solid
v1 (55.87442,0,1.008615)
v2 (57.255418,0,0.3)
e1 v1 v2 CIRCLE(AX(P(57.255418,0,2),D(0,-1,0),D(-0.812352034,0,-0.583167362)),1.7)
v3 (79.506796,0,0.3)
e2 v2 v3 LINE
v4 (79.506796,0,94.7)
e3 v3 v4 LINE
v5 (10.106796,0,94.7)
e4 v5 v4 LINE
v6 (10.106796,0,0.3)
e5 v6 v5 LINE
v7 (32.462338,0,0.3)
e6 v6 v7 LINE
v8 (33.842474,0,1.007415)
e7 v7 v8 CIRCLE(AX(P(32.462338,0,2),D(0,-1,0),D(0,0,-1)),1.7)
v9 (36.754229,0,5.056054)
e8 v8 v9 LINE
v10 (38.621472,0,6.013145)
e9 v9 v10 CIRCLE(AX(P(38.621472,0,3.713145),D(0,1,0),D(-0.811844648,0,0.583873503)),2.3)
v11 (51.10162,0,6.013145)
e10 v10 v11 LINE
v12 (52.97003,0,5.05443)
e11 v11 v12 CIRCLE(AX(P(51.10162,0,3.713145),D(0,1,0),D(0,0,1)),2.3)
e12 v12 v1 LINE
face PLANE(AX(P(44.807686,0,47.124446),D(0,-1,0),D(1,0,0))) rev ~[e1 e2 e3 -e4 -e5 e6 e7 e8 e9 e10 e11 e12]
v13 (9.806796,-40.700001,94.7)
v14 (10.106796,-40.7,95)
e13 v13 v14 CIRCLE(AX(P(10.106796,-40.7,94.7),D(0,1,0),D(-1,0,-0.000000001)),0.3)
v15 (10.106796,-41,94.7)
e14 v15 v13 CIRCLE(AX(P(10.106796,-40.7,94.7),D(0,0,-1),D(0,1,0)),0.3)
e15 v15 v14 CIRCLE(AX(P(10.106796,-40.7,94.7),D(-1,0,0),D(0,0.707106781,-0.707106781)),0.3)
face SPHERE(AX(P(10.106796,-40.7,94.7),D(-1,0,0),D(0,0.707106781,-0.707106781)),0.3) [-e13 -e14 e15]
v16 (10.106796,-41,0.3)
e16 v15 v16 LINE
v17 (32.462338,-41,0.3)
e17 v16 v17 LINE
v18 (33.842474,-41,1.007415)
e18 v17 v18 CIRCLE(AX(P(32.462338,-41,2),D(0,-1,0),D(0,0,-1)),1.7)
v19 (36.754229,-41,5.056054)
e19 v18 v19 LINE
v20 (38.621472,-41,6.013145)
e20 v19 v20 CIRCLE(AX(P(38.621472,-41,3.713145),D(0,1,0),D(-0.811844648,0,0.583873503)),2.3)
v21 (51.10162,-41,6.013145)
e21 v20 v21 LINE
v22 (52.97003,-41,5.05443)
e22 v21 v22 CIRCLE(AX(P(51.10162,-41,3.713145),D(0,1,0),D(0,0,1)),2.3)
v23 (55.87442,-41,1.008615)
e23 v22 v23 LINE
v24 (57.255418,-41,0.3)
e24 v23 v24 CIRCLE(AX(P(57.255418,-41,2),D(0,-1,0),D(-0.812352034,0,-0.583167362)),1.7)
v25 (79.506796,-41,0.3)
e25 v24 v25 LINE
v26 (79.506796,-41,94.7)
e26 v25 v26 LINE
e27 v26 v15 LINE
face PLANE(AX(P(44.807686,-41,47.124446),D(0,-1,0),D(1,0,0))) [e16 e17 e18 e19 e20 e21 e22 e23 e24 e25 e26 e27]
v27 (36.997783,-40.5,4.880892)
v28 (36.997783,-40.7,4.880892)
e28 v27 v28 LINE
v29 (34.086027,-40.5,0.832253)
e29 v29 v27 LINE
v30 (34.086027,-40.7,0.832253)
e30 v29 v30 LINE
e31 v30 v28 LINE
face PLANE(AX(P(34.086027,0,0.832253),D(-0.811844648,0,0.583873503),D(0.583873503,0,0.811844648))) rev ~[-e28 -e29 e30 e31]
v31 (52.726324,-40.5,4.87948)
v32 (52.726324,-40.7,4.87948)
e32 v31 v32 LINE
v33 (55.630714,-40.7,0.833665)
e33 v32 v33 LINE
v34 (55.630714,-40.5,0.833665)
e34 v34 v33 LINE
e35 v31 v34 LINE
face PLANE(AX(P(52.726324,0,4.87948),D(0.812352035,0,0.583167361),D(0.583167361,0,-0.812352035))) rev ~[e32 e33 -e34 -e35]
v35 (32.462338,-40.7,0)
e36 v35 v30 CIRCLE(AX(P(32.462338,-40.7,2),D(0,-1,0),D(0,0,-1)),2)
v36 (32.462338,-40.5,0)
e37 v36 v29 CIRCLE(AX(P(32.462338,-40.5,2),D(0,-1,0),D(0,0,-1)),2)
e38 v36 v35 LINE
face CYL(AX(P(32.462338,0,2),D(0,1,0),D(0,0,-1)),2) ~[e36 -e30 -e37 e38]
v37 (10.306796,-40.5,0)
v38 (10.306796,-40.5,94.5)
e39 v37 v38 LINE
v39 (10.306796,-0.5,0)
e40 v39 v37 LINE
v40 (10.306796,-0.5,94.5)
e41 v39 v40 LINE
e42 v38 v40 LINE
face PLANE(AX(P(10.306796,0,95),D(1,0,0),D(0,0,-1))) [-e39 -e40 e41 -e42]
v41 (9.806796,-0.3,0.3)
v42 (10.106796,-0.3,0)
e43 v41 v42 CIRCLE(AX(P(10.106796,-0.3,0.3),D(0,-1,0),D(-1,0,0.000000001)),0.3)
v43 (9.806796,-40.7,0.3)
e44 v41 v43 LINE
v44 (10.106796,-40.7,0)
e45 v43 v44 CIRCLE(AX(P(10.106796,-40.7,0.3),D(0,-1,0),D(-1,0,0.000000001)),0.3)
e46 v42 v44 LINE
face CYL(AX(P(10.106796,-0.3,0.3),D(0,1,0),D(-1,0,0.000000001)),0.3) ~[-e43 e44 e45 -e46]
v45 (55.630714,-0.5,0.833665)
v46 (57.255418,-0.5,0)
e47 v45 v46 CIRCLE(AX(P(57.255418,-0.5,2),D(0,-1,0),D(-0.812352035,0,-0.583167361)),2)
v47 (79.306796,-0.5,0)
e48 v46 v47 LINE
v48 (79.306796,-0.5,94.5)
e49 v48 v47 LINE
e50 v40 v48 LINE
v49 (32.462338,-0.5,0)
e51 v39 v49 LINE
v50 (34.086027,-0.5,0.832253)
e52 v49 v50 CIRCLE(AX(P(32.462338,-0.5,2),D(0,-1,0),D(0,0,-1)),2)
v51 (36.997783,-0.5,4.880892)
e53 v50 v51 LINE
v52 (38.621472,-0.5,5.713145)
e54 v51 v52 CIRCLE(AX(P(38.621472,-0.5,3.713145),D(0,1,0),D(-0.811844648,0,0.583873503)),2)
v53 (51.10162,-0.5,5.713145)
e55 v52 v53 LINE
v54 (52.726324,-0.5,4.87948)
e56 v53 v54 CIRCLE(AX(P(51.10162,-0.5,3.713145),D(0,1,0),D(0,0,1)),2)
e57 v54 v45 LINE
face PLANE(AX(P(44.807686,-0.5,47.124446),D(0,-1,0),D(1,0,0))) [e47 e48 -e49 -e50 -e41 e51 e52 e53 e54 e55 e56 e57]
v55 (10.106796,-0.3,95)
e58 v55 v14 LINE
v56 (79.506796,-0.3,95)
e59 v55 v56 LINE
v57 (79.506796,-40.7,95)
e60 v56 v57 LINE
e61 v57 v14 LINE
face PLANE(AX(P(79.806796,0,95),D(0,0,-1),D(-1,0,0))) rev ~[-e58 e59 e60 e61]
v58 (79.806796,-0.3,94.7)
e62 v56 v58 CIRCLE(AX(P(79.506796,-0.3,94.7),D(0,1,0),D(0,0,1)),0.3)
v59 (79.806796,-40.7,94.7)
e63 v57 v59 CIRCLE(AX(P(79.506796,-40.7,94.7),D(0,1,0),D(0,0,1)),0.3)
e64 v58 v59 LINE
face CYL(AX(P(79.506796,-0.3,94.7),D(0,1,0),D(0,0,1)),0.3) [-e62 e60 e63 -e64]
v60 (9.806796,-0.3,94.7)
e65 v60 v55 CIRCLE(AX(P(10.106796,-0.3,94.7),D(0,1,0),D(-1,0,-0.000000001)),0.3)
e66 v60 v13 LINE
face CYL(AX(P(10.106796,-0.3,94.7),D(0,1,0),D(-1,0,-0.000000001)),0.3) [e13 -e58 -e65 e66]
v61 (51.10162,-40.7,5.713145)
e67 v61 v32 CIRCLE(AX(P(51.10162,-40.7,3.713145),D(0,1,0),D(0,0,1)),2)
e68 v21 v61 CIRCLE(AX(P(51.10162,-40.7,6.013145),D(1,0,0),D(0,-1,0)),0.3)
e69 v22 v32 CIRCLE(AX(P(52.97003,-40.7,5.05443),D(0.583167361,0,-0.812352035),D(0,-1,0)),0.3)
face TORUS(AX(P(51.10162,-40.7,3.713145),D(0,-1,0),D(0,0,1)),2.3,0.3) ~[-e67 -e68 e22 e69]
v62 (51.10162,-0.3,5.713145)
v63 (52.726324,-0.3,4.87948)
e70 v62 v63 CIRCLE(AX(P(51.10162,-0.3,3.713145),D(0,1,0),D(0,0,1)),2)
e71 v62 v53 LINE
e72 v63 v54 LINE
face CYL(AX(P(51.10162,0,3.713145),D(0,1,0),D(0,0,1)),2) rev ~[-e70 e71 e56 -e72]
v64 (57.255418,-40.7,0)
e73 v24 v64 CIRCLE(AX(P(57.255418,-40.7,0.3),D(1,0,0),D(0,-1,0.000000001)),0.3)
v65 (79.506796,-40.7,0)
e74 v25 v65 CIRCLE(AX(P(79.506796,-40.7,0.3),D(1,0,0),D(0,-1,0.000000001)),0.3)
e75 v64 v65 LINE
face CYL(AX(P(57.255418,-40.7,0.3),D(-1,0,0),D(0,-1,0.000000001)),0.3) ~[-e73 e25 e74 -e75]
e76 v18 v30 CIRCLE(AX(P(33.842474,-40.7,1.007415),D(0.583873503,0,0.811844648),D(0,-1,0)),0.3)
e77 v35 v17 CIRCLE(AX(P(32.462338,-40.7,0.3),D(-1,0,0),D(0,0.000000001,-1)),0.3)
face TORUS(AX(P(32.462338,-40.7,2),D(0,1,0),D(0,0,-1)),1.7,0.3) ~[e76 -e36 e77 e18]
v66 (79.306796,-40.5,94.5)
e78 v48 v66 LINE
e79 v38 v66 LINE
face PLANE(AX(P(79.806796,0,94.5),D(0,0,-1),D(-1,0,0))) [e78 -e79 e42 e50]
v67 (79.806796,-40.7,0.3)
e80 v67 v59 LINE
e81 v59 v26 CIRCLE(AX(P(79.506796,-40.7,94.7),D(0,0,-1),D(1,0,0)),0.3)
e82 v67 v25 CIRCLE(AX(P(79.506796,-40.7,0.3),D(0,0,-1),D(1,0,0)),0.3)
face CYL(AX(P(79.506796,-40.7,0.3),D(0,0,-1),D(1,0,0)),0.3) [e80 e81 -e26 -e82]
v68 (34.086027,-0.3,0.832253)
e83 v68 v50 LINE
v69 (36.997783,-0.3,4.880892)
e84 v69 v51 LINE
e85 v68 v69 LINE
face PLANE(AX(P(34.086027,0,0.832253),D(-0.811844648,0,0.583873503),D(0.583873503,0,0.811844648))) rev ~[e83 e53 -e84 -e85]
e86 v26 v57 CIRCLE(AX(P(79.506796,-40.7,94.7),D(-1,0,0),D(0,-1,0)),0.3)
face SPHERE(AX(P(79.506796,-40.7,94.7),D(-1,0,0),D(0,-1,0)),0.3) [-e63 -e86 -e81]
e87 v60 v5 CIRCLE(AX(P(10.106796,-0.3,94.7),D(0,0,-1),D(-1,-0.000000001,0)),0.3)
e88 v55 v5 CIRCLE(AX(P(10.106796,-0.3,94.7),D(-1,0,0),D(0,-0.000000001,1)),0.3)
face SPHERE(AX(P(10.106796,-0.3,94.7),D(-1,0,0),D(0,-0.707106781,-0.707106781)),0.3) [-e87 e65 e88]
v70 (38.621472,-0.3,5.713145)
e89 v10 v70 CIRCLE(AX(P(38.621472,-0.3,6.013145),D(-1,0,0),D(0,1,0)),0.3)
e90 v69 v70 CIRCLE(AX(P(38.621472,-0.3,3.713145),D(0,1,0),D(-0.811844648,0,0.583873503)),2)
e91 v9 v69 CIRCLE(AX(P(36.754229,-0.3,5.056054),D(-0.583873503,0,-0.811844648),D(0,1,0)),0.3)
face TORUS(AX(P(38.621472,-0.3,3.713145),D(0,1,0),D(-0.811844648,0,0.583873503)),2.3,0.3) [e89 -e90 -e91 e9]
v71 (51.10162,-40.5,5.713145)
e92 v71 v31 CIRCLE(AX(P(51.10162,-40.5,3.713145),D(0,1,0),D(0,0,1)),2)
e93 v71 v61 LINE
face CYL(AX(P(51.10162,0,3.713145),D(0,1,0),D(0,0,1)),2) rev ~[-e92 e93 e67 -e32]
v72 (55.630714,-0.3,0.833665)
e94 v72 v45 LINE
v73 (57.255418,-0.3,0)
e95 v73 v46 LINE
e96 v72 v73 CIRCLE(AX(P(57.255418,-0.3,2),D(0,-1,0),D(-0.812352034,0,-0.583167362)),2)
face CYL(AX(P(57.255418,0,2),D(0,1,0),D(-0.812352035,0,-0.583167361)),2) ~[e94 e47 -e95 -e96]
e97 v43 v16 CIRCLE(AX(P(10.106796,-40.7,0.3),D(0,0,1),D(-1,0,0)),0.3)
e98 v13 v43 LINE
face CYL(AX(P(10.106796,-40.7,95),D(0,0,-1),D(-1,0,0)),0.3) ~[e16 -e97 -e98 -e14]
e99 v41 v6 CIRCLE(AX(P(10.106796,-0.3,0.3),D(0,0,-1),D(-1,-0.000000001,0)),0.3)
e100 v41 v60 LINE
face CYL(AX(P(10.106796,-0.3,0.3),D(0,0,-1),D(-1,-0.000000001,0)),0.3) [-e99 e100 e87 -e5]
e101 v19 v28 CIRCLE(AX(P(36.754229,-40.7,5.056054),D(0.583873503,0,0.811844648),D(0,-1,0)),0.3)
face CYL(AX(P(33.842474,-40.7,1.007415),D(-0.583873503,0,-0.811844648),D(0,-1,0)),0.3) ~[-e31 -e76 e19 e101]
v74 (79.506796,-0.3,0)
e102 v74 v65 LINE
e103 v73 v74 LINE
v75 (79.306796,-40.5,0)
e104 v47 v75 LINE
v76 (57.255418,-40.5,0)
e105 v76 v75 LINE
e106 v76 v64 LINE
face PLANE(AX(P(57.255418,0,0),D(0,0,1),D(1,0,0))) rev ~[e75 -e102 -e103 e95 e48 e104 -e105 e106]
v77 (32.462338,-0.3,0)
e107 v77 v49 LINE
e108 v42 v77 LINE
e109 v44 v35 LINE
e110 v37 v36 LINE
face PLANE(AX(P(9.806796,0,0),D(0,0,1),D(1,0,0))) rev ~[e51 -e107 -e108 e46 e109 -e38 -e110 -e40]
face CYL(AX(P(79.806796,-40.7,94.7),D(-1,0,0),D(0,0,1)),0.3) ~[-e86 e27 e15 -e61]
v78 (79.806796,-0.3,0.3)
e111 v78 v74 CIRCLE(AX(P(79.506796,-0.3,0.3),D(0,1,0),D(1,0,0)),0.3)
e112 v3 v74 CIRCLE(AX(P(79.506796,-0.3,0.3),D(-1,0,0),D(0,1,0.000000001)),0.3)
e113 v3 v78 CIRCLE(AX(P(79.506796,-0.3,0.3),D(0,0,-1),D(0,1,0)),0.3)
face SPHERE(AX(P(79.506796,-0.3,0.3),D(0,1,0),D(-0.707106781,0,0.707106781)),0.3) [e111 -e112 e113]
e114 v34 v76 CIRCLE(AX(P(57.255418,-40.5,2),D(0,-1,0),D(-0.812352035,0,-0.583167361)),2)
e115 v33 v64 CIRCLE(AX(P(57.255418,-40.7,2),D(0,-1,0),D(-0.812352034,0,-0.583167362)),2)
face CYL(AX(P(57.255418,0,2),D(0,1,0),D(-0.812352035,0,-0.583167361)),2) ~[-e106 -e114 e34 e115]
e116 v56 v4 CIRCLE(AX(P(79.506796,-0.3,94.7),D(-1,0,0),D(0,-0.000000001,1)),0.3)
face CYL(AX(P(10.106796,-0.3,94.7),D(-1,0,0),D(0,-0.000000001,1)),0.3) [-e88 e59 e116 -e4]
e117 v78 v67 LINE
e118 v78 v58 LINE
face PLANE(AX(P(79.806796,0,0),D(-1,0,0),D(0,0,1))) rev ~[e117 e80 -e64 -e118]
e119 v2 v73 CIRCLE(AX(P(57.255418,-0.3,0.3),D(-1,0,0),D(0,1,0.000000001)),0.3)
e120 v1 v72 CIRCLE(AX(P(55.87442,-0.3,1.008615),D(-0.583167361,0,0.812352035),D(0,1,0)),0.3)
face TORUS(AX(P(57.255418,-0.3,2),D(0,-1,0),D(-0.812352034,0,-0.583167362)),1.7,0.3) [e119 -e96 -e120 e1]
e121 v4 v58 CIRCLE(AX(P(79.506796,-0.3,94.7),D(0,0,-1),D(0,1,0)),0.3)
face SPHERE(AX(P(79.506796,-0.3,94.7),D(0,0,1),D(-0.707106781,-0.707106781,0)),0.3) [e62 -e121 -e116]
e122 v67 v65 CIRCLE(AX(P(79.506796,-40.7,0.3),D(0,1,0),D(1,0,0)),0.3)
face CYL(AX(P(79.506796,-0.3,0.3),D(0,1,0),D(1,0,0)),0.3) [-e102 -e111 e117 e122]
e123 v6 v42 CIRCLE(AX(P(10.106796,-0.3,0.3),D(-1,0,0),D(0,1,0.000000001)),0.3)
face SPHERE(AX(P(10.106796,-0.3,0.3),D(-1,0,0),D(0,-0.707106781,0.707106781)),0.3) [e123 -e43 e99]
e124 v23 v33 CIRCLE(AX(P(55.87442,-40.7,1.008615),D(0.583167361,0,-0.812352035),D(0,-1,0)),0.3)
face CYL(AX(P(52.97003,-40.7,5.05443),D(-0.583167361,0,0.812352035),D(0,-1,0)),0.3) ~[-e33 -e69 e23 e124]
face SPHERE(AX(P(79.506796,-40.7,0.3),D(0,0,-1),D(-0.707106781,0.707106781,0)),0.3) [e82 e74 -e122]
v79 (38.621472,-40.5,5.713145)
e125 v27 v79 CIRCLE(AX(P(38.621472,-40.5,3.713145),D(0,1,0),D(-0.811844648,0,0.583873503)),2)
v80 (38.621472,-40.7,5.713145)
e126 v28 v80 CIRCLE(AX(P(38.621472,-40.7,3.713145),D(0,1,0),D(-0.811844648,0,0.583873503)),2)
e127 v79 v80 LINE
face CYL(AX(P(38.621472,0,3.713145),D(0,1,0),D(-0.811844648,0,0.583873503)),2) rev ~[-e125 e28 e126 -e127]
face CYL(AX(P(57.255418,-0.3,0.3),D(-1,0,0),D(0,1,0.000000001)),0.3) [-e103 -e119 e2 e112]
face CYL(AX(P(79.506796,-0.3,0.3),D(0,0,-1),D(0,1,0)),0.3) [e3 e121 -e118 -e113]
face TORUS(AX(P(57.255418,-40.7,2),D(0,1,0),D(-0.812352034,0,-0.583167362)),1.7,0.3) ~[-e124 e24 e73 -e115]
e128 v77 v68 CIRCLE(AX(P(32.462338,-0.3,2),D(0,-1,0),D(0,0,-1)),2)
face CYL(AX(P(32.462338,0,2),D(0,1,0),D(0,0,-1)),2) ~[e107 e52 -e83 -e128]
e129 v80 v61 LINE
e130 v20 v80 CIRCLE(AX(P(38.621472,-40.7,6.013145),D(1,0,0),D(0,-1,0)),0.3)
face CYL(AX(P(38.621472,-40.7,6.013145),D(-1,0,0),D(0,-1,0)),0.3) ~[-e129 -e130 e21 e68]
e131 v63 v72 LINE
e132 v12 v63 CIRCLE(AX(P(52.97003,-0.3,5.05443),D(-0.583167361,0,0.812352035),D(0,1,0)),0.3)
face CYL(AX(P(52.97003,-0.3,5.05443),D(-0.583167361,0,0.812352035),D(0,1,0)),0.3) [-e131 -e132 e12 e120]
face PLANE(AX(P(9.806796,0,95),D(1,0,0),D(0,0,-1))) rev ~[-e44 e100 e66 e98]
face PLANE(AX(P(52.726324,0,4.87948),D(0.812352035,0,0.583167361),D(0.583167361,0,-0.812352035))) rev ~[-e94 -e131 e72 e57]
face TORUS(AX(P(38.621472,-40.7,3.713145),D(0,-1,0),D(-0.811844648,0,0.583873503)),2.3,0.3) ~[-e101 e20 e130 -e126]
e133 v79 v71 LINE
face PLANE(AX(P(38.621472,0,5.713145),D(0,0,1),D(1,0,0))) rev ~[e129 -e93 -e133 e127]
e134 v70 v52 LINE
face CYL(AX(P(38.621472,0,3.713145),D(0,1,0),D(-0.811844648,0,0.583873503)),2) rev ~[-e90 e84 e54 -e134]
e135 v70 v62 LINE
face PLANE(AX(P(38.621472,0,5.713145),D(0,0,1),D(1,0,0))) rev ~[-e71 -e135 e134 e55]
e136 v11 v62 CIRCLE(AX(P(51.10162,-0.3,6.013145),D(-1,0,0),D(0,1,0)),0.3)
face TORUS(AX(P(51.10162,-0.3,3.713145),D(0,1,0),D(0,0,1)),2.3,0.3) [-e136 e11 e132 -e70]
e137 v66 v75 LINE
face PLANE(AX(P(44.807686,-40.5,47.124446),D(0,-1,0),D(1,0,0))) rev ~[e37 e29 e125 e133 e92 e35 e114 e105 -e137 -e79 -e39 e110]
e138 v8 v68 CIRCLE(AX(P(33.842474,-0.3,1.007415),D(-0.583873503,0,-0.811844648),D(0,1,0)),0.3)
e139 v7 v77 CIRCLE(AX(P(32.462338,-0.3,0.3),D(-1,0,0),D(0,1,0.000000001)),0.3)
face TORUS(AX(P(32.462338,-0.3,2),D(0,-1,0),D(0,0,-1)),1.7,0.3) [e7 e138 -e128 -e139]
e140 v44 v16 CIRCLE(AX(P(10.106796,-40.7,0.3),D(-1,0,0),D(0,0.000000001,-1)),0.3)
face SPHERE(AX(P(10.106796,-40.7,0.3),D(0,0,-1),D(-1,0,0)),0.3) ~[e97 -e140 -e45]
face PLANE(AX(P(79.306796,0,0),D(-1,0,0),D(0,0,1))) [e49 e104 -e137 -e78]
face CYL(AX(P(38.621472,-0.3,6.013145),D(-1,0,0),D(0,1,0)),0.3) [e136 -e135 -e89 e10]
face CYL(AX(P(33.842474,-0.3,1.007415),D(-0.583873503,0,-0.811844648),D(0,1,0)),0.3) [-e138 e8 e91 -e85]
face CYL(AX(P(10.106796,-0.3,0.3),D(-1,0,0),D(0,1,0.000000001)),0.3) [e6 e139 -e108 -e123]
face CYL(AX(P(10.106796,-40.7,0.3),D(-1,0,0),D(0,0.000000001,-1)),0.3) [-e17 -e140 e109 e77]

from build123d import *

# Parameters (mm, degrees)
F1_DEPTH     = 41
F2_T         = -0.5
F3_R         = 0.3
F4_T1_DEPTH  = 40.4
F4_T3_DEPTH  = 69.4
F4_T5_DEPTH  = 94.4
F4_T7_DEPTH  = 22.3555421914
F4_T9_DEPTH  = 4.9869624773
F4_T11_DEPTH = 22.2513779286
F4_T13_DEPTH = 12.4801482885
F4_T15_DEPTH = 4.9803706459
F4_S19_W     = 0.3
F4_S19_H     = 0.3
F4_T20_DEPTH = 0.3
F4_S25_W     = 0.3
F4_S25_H     = 0.3
F4_T26_DEPTH = 0.3
F4_S31_W     = 0.3
F4_S31_H     = 0.3
F4_T32_DEPTH = 0.3
F4_S37_W     = 0.3
F4_S37_H     = 0.3
F4_T38_DEPTH = 0.3
F4_S43_W     = 0.3
F4_S43_H     = 0.3
F4_T44_DEPTH = 0.3
F4_S49_W     = 0.3
F4_S49_H     = 0.3
F4_T50_DEPTH = 0.3
F4_T54_ANGLE = 54.2765520119
F4_T56_ANGLE = 54.2765520119
F4_T58_ANGLE = 54.2765520119
F4_T60_ANGLE = 54.3263722655
F4_T62_ANGLE = 54.3263722655
F4_T64_ANGLE = 54.3263722655
F4_T66_ANGLE = 54.3263722655
F4_T68_ANGLE = 54.2765520119
F4_T70_ANGLE = 90
F4_T72_ANGLE = 90


# Not quite as in the source:
# - a fillet or chamfer that OpenCascade refuses, or shapes differently, is made with other operations: its cross-section is extruded or revolved along the edge and cut away or added
# - a feature names something its author has since deleted; it is built from what else it names


with BuildPart() as f1:
    # F0 (on Front) → F1 (new body)
    with BuildSketch(Plane.XZ):
        with BuildLine():
            Line((9.8067959771, 95), (9.8067959771, 0))
            Line((9.8067959771, 0), (32.4623381684, 0))
            ThreePointArc((32.4623381684, 0), (33.3746171792, 0.2201834346), (34.086027464, 0.8322529934))
            Line((34.086027464, 0.8322529934), (36.9977827164, 4.8808917895))
            ThreePointArc((36.9977827164, 4.8808917895), (37.7091930013, 5.4929613484), (38.621472012, 5.7131447829))
            Line((38.621472012, 5.7131447829), (44.8583289981, 5.7131447829))
            Line((44.8583289981, 5.7131447829), (51.1016203005, 5.7131447829))
            ThreePointArc((51.1016203005, 5.7131447829), (52.0146730247, 5.4925645543), (52.7263243702, 4.8794795058))
            Line((52.7263243702, 4.8794795058), (55.6307139787, 0.8336652772))
            ThreePointArc((55.6307139787, 0.8336652772), (56.3423653243, 0.2205802286), (57.2554180484, 0))
            Line((57.2554180484, 0), (79.8067959771, 0))
            Line((79.8067959771, 0), (79.8067959771, 95))
            Line((79.8067959771, 95), (9.8067959771, 95))
        make_face()
    extrude(amount=F1_DEPTH)

    # F2
    f2_openings = [f1.faces().sort_by_distance(p)[0] for p in [
        (21.134567, -20.5, 0),
        (33.374617, -20.5, 0.220183),
        (35.541905, -20.5, 2.856572),
        (37.709193, -20.5, 5.492961),
        (44.861546, -20.5, 5.713145),
        (52.014673, -20.5, 5.492565),
        (56.342365, -20.5, 0.22058),
        (68.531107, -20.5, 0),
        (54.178519, -20.5, 2.856572),
    ]]
    offset(amount=F2_T, openings=f2_openings)

    # F3
    f3_edges = [f1.edges().sort_by_distance(p)[0] for p in [
        (44.806796, -41, 95),
        (9.806796, -41, 47.5),
    ]]
    fillet(f3_edges, radius=F3_R)

    # F4: fillet of radius 0.3 on 11 edges, made by hand

    # F4_s2 → F4_t1 (cut)
    with BuildSketch(Plane.XZ.offset(0.3)):
        with BuildLine():
            ThreePointArc((9.8067959771, 94.7), (9.8946639427, 94.9121320344), (10.1067959771, 95))
            Line((10.1067959771, 95), (9.8067959771, 95))
            Line((9.8067959771, 95), (9.8067959771, 94.7))
        make_face()
        with BuildLine():
            ThreePointArc((79.5067959771, 95), (79.7189280114, 94.9121320344), (79.8067959771, 94.7))
            Line((79.8067959771, 94.7), (79.8067959771, 95))
            Line((79.8067959771, 95), (79.5067959771, 95))
        make_face()
        with BuildLine():
            ThreePointArc((79.8067959771, 0.3), (79.7189280114, 0.0878679656), (79.5067959771, 0))
            Line((79.5067959771, 0), (79.8067959771, 0))
            Line((79.8067959771, 0), (79.8067959771, 0.3))
        make_face()
        with BuildLine():
            ThreePointArc((9.8067959771, 0.3), (9.8946639427, 0.0878679656), (10.1067959771, 0))
            Line((10.1067959771, 0), (9.8067959771, 0))
            Line((9.8067959771, 0), (9.8067959771, 0.3))
        make_face()
    extrude(amount=F4_T1_DEPTH, mode=Mode.SUBTRACT)

    # F4_s4 → F4_t3 (cut)
    with BuildSketch(Plane.YZ.offset(10.1067959771)):
        with BuildLine():
            ThreePointArc((-0.3, 95), (-0.0878679656, 94.9121320344), (0, 94.7))
            Line((0, 94.7), (0, 95))
            Line((0, 95), (-0.3, 95))
        make_face()
    extrude(amount=F4_T3_DEPTH, mode=Mode.SUBTRACT)

    # F4_s6 → F4_t5 (cut)
    with BuildSketch(Plane.XY.offset(0.3)):
        with BuildLine():
            ThreePointArc((9.8067959771, -0.3), (9.8946639427, -0.0878679656), (10.1067959771, 0))
            Line((10.1067959771, 0), (9.8067959771, 0))
            Line((9.8067959771, 0), (9.8067959771, -0.3))
        make_face()
        with BuildLine():
            ThreePointArc((79.5067959771, 0), (79.7189280114, -0.0878679656), (79.8067959771, -0.3))
            Line((79.8067959771, -0.3), (79.8067959771, 0))
            Line((79.8067959771, 0), (79.5067959771, 0))
        make_face()
        with BuildLine():
            ThreePointArc((79.8067959771, -40.7), (79.7189280114, -40.9121320344), (79.5067959771, -41))
            Line((79.5067959771, -41), (79.8067959771, -41))
            Line((79.8067959771, -41), (79.8067959771, -40.7))
        make_face()
    extrude(amount=F4_T5_DEPTH, mode=Mode.SUBTRACT)

    # F4_s8 → F4_t7 (cut)
    with BuildSketch(Plane.YZ.offset(10.1067959771)):
        with BuildLine():
            ThreePointArc((-40.7, 0), (-40.9121320344, 0.0878679656), (-41, 0.3))
            Line((-41, 0.3), (-41, 0))
            Line((-41, 0), (-40.7, 0))
        make_face()
        with BuildLine():
            ThreePointArc((0, 0.3), (-0.0878679656, 0.0878679656), (-0.3, 0))
            Line((-0.3, 0), (0, 0))
            Line((0, 0), (0, 0.3))
        make_face()
    extrude(amount=F4_T7_DEPTH, mode=Mode.SUBTRACT)

    # F4_s10 → F4_t9 (cut)
    with BuildSketch(Plane(origin=(12.0147086319, 0, 16.7058050126), x_dir=(0, 1, 0), z_dir=(0.5838735033, 0, 0.8118446478))):
        with BuildLine():
            ThreePointArc((-41, -26.8866284908), (-40.9121320344, -27.0987605251), (-40.7, -27.1866284908))
            Line((-40.7, -27.1866284908), (-41, -27.1866284908))
            Line((-41, -27.1866284908), (-41, -26.8866284908))
        make_face()
        with BuildLine():
            ThreePointArc((0, -26.8866284908), (-0.0878679656, -27.0987605251), (-0.3, -27.1866284908))
            Line((-0.3, -27.1866284908), (0, -27.1866284908))
            Line((0, -27.1866284908), (0, -26.8866284908))
        make_face()
    extrude(amount=F4_T9_DEPTH, mode=Mode.SUBTRACT)

    # F4_s12 → F4_t11 (cut)
    with BuildSketch(Plane.YZ.offset(57.2554180484)):
        with BuildLine():
            ThreePointArc((-41, 0.3), (-40.9121320344, 0.0878679656), (-40.7, 0))
            Line((-40.7, 0), (-41, 0))
            Line((-41, 0), (-41, 0.3))
        make_face()
        with BuildLine():
            ThreePointArc((0, 0.3), (-0.0878679656, 0.0878679656), (-0.3, 0))
            Line((-0.3, 0), (0, 0))
            Line((0, 0), (0, 0.3))
        make_face()
    extrude(amount=F4_T11_DEPTH, mode=Mode.SUBTRACT)

    # F4_s14 → F4_t13 (cut)
    with BuildSketch(Plane.YZ.offset(38.621472012)):
        with BuildLine():
            ThreePointArc((0, 6.0131447829), (-0.0878679656, 5.8010127486), (-0.3, 5.7131447829))
            Line((-0.3, 5.7131447829), (0, 5.7131447829))
            Line((0, 5.7131447829), (0, 6.0131447829))
        make_face()
        with BuildLine():
            ThreePointArc((-41, 6.0131447829), (-40.9121320344, 5.8010127486), (-40.7, 5.7131447829))
            Line((-40.7, 5.7131447829), (-41, 5.7131447829))
            Line((-41, 5.7131447829), (-41, 6.0131447829))
        make_face()
    extrude(amount=F4_T13_DEPTH, mode=Mode.SUBTRACT)

    # F4_s16 → F4_t15 (cut)
    with BuildSketch(Plane(origin=(15.6197974129, 0, -21.7583751289), x_dir=(0, 1, 0), z_dir=(0.5831673614, 0, -0.8123520349))):
        with BuildLine():
            ThreePointArc((0, 45.9778900823), (-0.0878679656, 45.765758048), (-0.3, 45.6778900823))
            Line((-0.3, 45.6778900823), (0, 45.6778900823))
            Line((0, 45.6778900823), (0, 45.9778900823))
        make_face()
        with BuildLine():
            ThreePointArc((-41, 45.9778900823), (-40.9121320344, 45.765758048), (-40.7, 45.6778900823))
            Line((-40.7, 45.6778900823), (-41, 45.6778900823))
            Line((-41, 45.6778900823), (-41, 45.9778900823))
        make_face()
    extrude(amount=F4_T15_DEPTH, mode=Mode.SUBTRACT)


with BuildPart() as f4_tool18:
    # F4_s19 → F4_t20 (new body)
    with BuildSketch(Plane.YZ.offset(10.1067959771)):
        with Locations((-40.85, 94.85)):
            Rectangle(F4_S19_W, F4_S19_H)
    extrude(amount=-F4_T20_DEPTH)

    # F4_s21 → F4_t22 (revolve, cut)
    with BuildSketch(Plane(origin=(10.1067959771, -40.7, 94.7), x_dir=(0, 0.7071067812, -0.7071067812), z_dir=(0, 0.7071067812, 0.7071067812))):
        with BuildLine():
            ThreePointArc((0, -0.3), (0.3, 0), (0, 0.3))
            Line((0, 0.3), (0, -0.3))
        make_face()
    revolve(axis=Axis((10.1067959771, -40.7, 94.7), (-1, 0, 0)), mode=Mode.SUBTRACT)


with BuildPart() as f1_1:
    add(f1.part)

    # F4_t17: cut F4_tool18
    add(f4_tool18.part, mode=Mode.SUBTRACT)


with BuildPart() as f4_tool24:
    # F4_s25 → F4_t26 (new body)
    with BuildSketch(Plane.YZ.offset(10.1067959771)):
        with Locations((-0.15, 94.85)):
            Rectangle(F4_S25_W, F4_S25_H)
    extrude(amount=-F4_T26_DEPTH)

    # F4_s27 → F4_t28 (revolve, cut)
    with BuildSketch(Plane(origin=(10.1067959771, -0.3, 94.7), x_dir=(0, -0.7071067812, -0.7071067812), z_dir=(0, 0.7071067812, -0.7071067812))):
        with BuildLine():
            ThreePointArc((0, -0.3), (0.3, 0), (0, 0.3))
            Line((0, 0.3), (0, -0.3))
        make_face()
    revolve(axis=Axis((10.1067959771, -0.3, 94.7), (-1, 0, 0)), mode=Mode.SUBTRACT)


with BuildPart() as f1_2:
    add(f1_1.part)

    # F4_t23: cut F4_tool24
    add(f4_tool24.part, mode=Mode.SUBTRACT)


with BuildPart() as f4_tool30:
    # F4_s31 → F4_t32 (new body)
    with BuildSketch(Plane.XY.offset(94.7)):
        with Locations((79.6567959771, -0.15)):
            Rectangle(F4_S31_W, F4_S31_H)
    extrude(amount=F4_T32_DEPTH)

    # F4_s33 → F4_t34 (revolve, cut)
    with BuildSketch(Plane(origin=(79.5067959771, -0.3, 94.7), x_dir=(-0.7071067812, -0.7071067812, 0), z_dir=(-0.7071067812, 0.7071067812, 0))):
        with BuildLine():
            ThreePointArc((0, -0.3), (0.3, 0), (0, 0.3))
            Line((0, 0.3), (0, -0.3))
        make_face()
    revolve(axis=Axis((79.5067959771, -0.3, 94.7), (0, 0, 1)), mode=Mode.SUBTRACT)


with BuildPart() as f1_3:
    add(f1_2.part)

    # F4_t29: cut F4_tool30
    add(f4_tool30.part, mode=Mode.SUBTRACT)


with BuildPart() as f4_tool36:
    # F4_s37 → F4_t38 (new body)
    with BuildSketch(Plane.YZ.offset(10.1067959771)):
        with Locations((-0.15, 0.15)):
            Rectangle(F4_S37_W, F4_S37_H)
    extrude(amount=-F4_T38_DEPTH)

    # F4_s39 → F4_t40 (revolve, cut)
    with BuildSketch(Plane(origin=(10.1067959771, -0.3, 0.3), x_dir=(0, -0.7071067812, 0.7071067812), z_dir=(0, -0.7071067812, -0.7071067812))):
        with BuildLine():
            ThreePointArc((0, -0.3), (0.3, 0), (0, 0.3))
            Line((0, 0.3), (0, -0.3))
        make_face()
    revolve(axis=Axis((10.1067959771, -0.3, 0.3), (-1, 0, 0)), mode=Mode.SUBTRACT)


with BuildPart() as f1_4:
    add(f1_3.part)

    # F4_t35: cut F4_tool36
    add(f4_tool36.part, mode=Mode.SUBTRACT)


with BuildPart() as f4_tool42:
    # F4_s43 → F4_t44 (new body)
    with BuildSketch(Plane.XZ.offset(0.3)):
        with Locations((79.6567959771, 0.15)):
            Rectangle(F4_S43_W, F4_S43_H)
    extrude(amount=-F4_T44_DEPTH)

    # F4_s45 → F4_t46 (revolve, cut)
    with BuildSketch(Plane(origin=(79.5067959771, -0.3, 0.3), x_dir=(-0.7071067812, 0, 0.7071067812), z_dir=(-0.7071067812, 0, -0.7071067812))):
        with BuildLine():
            ThreePointArc((0, -0.3), (0.3, 0), (0, 0.3))
            Line((0, 0.3), (0, -0.3))
        make_face()
    revolve(axis=Axis((79.5067959771, -0.3, 0.3), (0, 1, 0)), mode=Mode.SUBTRACT)


with BuildPart() as f1_5:
    add(f1_4.part)

    # F4_t41: cut F4_tool42
    add(f4_tool42.part, mode=Mode.SUBTRACT)


with BuildPart() as f4_tool48:
    # F4_s49 → F4_t50 (new body)
    with BuildSketch(Plane.XY.offset(0.3)):
        with Locations((79.6567959771, -40.85)):
            Rectangle(F4_S49_W, F4_S49_H)
    extrude(amount=-F4_T50_DEPTH)

    # F4_s51 → F4_t52 (revolve, cut)
    with BuildSketch(Plane(origin=(79.5067959771, -40.7, 0.3), x_dir=(-0.7071067812, 0.7071067812, 0), z_dir=(-0.7071067812, -0.7071067812, 0))):
        with BuildLine():
            ThreePointArc((0, -0.3), (0.3, 0), (0, 0.3))
            Line((0, 0.3), (0, -0.3))
        make_face()
    revolve(axis=Axis((79.5067959771, -40.7, 0.3), (0, 0, -1)), mode=Mode.SUBTRACT)


with BuildPart() as f1_6:
    add(f1_5.part)

    # F4_t47: cut F4_tool48
    add(f4_tool48.part, mode=Mode.SUBTRACT)

    # F4_s53 → F4_t54 (revolve, cut)
    with BuildSketch(Plane.YZ.offset(32.4623381684)):
        with BuildLine():
            ThreePointArc((-41, 0.3), (-40.9121320344, 0.0878679656), (-40.7, 0))
            Line((-40.7, 0), (-41, 0))
            Line((-41, 0), (-41, 0.3))
        make_face()
    revolve(axis=Axis((32.4623381684, -41, 2), (0, -1, 0)), revolution_arc=F4_T54_ANGLE, mode=Mode.SUBTRACT)

    # F4_s55 → F4_t56 (revolve, cut)
    with BuildSketch(Plane.YZ.offset(32.4623381684)):
        with BuildLine():
            ThreePointArc((0, 0.3), (-0.0878679656, 0.0878679656), (-0.3, 0))
            Line((-0.3, 0), (0, 0))
            Line((0, 0), (0, 0.3))
        make_face()
    revolve(axis=Axis((32.4623381684, 0, 2), (0, -1, 0)), revolution_arc=F4_T56_ANGLE, mode=Mode.SUBTRACT)

    # F4_s57 → F4_t58 (revolve, cut)
    with BuildSketch(Plane(origin=(14.9264638842, 0, 20.7544438086), x_dir=(0, 1, 0), z_dir=(-0.5838735033, 0, -0.8118446478))):
        with BuildLine():
            ThreePointArc((0, 26.8866284908), (-0.0878679656, 27.0987605251), (-0.3, 27.1866284908))
            Line((-0.3, 27.1866284908), (0, 27.1866284908))
            Line((0, 27.1866284908), (0, 26.8866284908))
        make_face()
    revolve(axis=Axis((38.621472012, 0, 3.7131447829), (0, 1, 0)), revolution_arc=F4_T58_ANGLE, mode=Mode.SUBTRACT)

    # F4_s59 → F4_t60 (revolve, cut)
    with BuildSketch(Plane.YZ.offset(51.1016203005)):
        with BuildLine():
            ThreePointArc((0, 6.0131447829), (-0.0878679656, 5.8010127486), (-0.3, 5.7131447829))
            Line((-0.3, 5.7131447829), (0, 5.7131447829))
            Line((0, 5.7131447829), (0, 6.0131447829))
        make_face()
    revolve(axis=Axis((51.1016203005, 0, 3.7131447829), (0, 1, 0)), revolution_arc=F4_T60_ANGLE, mode=Mode.SUBTRACT)

    # F4_s61 → F4_t62 (revolve, cut)
    with BuildSketch(Plane(origin=(18.5241870214, 0, -25.8041893575), x_dir=(0, 1, 0), z_dir=(-0.5831673614, 0, 0.8123520349))):
        with BuildLine():
            ThreePointArc((0, -45.9778900823), (-0.0878679656, -45.765758048), (-0.3, -45.6778900823))
            Line((-0.3, -45.6778900823), (0, -45.6778900823))
            Line((0, -45.6778900823), (0, -45.9778900823))
        make_face()
    revolve(axis=Axis((57.2554180484, 0, 2), (0, -1, 0)), revolution_arc=F4_T62_ANGLE, mode=Mode.SUBTRACT)

    # F4_s63 → F4_t64 (revolve, cut)
    with BuildSketch(Plane(origin=(18.5241870214, 0, -25.8041893575), x_dir=(0, 1, 0), z_dir=(-0.5831673614, 0, 0.8123520349))):
        with BuildLine():
            ThreePointArc((-41, -45.9778900823), (-40.9121320344, -45.765758048), (-40.7, -45.6778900823))
            Line((-40.7, -45.6778900823), (-41, -45.6778900823))
            Line((-41, -45.6778900823), (-41, -45.9778900823))
        make_face()
    revolve(axis=Axis((57.2554180484, -41, 2), (0, -1, 0)), revolution_arc=F4_T64_ANGLE, mode=Mode.SUBTRACT)

    # F4_s65 → F4_t66 (revolve, cut)
    with BuildSketch(Plane.YZ.offset(51.1016203005)):
        with BuildLine():
            ThreePointArc((-41, 6.0131447829), (-40.9121320344, 5.8010127486), (-40.7, 5.7131447829))
            Line((-40.7, 5.7131447829), (-41, 5.7131447829))
            Line((-41, 5.7131447829), (-41, 6.0131447829))
        make_face()
    revolve(axis=Axis((51.1016203005, -41, 3.7131447829), (0, 1, 0)), revolution_arc=F4_T66_ANGLE, mode=Mode.SUBTRACT)

    # F4_s67 → F4_t68 (revolve, cut)
    with BuildSketch(Plane(origin=(14.9264638842, 0, 20.7544438086), x_dir=(0, 1, 0), z_dir=(-0.5838735033, 0, -0.8118446478))):
        with BuildLine():
            ThreePointArc((-41, 26.8866284908), (-40.9121320344, 27.0987605251), (-40.7, 27.1866284908))
            Line((-40.7, 27.1866284908), (-41, 27.1866284908))
            Line((-41, 27.1866284908), (-41, 26.8866284908))
        make_face()
    revolve(axis=Axis((38.621472012, -41, 3.7131447829), (0, 1, 0)), revolution_arc=F4_T68_ANGLE, mode=Mode.SUBTRACT)

    # F4_s69 → F4_t70 (revolve, cut)
    with BuildSketch(Plane.XZ.offset(40.7)):
        with BuildLine():
            ThreePointArc((9.8067959771, 0.3), (9.8946639427, 0.0878679656), (10.1067959771, 0))
            Line((10.1067959771, 0), (9.8067959771, 0))
            Line((9.8067959771, 0), (9.8067959771, 0.3))
        make_face()
    revolve(axis=Axis((10.1067959771, -40.7, 0), (0, 0, 1)), revolution_arc=F4_T70_ANGLE, mode=Mode.SUBTRACT)

    # F4_s71 → F4_t72 (revolve, cut)
    with BuildSketch(Plane.XY.offset(94.7)):
        with BuildLine():
            ThreePointArc((79.8067959771, -40.7), (79.7189280114, -40.9121320344), (79.5067959771, -41))
            Line((79.5067959771, -41), (79.8067959771, -41))
            Line((79.8067959771, -41), (79.8067959771, -40.7))
        make_face()
    revolve(axis=Axis((79.8067959771, -40.7, 94.7), (-1, 0, 0)), revolution_arc=F4_T72_ANGLE, mode=Mode.SUBTRACT)


solid = f1_6.part
